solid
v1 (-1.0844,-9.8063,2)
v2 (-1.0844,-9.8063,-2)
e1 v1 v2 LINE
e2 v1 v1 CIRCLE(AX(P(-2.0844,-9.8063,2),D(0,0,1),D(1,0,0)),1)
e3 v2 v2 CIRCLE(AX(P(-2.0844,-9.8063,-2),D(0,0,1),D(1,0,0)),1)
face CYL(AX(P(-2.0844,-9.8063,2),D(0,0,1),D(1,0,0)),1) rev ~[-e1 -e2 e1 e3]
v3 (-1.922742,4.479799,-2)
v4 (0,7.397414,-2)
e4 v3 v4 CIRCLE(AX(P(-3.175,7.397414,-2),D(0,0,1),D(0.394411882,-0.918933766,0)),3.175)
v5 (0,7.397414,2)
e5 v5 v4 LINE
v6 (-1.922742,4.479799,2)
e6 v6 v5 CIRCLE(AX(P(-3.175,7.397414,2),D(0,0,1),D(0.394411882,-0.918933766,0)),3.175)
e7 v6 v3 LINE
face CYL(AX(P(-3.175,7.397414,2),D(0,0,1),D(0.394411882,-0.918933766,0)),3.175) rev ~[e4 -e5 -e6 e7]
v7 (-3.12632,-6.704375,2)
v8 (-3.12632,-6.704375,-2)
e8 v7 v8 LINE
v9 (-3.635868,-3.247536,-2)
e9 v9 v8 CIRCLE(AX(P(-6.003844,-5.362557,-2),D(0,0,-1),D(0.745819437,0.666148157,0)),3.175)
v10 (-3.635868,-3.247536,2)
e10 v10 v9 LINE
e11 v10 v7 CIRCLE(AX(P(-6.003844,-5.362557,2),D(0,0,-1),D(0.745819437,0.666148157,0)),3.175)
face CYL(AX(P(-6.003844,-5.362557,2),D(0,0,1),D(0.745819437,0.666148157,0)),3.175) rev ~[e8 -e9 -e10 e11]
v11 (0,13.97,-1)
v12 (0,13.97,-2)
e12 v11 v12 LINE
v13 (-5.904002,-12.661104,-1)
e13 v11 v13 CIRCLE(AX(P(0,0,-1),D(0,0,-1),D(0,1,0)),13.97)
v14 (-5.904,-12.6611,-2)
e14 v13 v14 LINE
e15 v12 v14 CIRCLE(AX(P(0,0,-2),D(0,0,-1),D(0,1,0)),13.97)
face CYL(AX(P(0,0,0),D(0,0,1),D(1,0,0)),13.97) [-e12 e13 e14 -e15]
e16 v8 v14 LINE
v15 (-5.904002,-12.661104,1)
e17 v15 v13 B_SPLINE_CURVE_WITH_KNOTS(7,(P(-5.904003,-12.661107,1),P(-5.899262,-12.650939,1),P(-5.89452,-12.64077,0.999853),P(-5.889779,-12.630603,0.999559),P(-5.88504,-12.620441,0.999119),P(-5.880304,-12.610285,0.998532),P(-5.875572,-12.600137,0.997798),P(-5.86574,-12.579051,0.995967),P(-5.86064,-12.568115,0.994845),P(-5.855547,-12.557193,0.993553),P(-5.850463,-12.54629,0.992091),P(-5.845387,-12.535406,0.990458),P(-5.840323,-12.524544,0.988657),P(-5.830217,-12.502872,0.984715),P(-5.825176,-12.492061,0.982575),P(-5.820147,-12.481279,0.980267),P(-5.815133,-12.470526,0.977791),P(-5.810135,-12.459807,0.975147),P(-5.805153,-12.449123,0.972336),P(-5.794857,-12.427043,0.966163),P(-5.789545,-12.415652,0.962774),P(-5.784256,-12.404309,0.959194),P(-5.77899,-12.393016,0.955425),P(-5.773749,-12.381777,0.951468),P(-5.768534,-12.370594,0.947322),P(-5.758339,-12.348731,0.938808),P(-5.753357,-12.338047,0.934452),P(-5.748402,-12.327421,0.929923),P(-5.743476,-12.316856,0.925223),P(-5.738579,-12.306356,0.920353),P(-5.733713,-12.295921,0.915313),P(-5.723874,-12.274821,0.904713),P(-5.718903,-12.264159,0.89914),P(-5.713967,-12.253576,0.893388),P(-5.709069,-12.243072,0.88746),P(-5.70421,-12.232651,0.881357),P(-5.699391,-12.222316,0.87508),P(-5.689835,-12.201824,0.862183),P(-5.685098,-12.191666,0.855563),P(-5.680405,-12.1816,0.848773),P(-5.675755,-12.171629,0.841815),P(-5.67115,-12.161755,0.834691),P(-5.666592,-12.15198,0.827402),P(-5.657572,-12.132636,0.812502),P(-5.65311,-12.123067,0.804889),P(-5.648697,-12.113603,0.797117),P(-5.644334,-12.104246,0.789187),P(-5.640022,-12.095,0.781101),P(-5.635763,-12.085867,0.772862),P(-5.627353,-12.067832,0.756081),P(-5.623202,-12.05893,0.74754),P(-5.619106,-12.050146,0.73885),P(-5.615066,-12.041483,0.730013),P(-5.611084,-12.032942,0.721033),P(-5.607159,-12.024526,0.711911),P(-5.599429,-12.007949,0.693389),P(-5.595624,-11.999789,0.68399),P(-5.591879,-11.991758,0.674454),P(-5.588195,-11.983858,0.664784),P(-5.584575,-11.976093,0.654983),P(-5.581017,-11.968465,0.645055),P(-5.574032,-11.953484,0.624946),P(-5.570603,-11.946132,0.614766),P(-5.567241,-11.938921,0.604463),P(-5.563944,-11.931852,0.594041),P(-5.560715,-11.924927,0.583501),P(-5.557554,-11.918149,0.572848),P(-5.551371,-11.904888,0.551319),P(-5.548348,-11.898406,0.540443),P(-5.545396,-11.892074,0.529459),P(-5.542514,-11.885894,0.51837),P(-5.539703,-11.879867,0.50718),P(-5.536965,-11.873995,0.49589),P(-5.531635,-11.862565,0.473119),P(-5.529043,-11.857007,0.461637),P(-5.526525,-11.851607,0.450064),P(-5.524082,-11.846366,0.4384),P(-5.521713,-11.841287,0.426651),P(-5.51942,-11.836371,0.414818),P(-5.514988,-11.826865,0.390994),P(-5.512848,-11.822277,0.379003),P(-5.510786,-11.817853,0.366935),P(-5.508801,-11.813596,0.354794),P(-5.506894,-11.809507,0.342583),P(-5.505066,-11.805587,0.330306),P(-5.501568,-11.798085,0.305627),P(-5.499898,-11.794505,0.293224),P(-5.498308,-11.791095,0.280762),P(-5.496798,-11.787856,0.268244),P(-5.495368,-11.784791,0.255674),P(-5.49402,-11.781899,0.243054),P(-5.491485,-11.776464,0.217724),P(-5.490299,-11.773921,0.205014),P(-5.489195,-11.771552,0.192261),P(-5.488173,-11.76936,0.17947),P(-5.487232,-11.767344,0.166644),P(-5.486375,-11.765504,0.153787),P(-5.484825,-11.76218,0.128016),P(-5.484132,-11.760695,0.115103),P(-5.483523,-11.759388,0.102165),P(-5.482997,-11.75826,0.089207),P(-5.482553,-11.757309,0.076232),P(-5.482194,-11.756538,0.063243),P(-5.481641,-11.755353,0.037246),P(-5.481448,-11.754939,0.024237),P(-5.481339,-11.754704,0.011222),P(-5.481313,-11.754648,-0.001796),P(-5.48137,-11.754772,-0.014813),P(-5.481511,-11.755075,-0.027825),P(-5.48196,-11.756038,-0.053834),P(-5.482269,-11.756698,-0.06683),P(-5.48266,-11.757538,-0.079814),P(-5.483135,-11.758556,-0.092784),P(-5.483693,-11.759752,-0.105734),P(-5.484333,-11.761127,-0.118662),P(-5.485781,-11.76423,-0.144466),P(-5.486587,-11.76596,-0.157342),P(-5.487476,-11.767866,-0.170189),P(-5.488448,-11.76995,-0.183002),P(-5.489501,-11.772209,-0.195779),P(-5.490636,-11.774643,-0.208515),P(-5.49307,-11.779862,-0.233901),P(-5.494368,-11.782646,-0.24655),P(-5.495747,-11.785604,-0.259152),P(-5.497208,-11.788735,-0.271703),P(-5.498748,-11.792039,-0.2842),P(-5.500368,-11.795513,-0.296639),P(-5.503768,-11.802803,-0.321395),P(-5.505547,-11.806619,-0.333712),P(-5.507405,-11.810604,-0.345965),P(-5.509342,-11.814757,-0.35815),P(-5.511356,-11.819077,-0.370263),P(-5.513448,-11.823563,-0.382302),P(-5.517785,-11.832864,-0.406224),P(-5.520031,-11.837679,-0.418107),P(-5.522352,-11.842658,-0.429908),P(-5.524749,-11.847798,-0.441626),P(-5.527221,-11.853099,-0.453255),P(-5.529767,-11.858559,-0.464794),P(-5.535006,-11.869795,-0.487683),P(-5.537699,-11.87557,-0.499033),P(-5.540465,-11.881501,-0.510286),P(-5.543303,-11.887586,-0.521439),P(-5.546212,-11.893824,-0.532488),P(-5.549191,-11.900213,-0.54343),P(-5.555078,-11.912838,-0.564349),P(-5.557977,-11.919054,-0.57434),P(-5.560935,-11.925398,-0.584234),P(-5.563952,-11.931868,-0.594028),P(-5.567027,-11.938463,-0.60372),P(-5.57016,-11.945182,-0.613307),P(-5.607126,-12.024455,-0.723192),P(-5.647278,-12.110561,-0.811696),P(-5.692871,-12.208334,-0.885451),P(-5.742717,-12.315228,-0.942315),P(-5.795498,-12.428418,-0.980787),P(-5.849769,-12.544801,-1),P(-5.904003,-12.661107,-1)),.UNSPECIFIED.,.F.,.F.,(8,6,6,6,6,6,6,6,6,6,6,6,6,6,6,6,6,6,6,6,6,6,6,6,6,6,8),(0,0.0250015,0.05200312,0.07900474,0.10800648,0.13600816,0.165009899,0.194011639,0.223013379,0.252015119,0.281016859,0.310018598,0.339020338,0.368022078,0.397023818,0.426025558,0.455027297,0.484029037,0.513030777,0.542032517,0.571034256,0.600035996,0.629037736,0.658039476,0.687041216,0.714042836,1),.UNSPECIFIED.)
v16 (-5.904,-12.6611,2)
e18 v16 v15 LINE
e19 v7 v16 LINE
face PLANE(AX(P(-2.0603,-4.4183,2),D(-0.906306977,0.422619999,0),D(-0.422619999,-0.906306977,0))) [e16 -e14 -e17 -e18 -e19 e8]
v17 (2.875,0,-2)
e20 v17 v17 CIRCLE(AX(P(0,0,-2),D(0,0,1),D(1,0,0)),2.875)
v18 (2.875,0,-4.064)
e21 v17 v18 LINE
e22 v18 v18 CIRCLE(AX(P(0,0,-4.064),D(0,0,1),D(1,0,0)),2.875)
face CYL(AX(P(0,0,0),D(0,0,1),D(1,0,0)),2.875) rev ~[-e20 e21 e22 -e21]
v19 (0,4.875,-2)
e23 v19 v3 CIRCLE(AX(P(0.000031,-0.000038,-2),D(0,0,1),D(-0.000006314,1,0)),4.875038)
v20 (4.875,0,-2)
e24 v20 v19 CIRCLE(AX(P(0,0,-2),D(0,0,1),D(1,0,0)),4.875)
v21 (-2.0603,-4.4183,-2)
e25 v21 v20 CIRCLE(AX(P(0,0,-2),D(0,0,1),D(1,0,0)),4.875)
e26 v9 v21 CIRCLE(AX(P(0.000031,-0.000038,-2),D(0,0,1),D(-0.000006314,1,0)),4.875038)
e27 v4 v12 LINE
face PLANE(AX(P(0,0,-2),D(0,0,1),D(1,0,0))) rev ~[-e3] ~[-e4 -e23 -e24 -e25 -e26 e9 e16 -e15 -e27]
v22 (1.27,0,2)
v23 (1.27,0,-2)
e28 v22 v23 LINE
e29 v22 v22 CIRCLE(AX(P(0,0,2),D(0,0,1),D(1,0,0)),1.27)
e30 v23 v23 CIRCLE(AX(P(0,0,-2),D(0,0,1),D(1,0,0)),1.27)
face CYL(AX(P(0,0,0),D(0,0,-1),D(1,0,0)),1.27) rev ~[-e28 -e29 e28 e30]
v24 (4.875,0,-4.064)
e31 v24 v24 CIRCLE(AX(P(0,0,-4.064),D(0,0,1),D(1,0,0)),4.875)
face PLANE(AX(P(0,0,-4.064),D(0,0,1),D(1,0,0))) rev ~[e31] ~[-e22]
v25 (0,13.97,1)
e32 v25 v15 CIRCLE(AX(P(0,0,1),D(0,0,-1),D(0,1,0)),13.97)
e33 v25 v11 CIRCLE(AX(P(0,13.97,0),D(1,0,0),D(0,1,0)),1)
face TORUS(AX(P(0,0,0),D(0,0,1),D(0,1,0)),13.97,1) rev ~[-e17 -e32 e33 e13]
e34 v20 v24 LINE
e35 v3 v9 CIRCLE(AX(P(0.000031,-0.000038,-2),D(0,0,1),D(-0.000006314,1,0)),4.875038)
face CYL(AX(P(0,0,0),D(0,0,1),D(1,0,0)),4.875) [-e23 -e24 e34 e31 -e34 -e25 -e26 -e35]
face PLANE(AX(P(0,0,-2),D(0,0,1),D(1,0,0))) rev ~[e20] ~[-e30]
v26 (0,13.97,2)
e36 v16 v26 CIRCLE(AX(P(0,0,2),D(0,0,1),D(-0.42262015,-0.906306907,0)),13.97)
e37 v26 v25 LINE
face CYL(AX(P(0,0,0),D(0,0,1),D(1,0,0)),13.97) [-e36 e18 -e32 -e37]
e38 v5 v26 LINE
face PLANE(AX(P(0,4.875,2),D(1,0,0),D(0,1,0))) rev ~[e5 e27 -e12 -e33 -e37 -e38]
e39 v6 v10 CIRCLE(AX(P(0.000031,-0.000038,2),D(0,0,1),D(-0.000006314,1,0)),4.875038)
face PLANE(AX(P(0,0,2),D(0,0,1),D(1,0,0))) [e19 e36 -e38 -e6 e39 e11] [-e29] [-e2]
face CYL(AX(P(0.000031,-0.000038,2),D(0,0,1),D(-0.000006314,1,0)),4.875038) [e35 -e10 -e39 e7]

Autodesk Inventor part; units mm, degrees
ref_plane "YZ Plane" through (0, 0, 0) normal (1, 0, 0) x (0, 1, 0)
ref_plane "XZ Plane" through (0, 0, 0) normal (0, 1, 0) x (-1, 0, 0)
ref_plane "XY Plane" through (0, 0, 0) normal (0, 0, 1) x (1, 0, 0)
sketch "Sketch1" plane through (0, 0, 0) normal (0, 0, 1) x (1, 0, 0)
  circle A0 centre (0, 0) radius 2.875
  circle A1 centre (0, 0) radius 4.875
  circle A2 centre (0, 0) radius 13.97
  dimension "d0" = 5.75
  dimension "d2" = 2
  dimension "d3" = 27.94
extrude "Extrusion1" add sketch "Sketch1" against normal blind 4.064 contours A1
sketch "Sketch2" plane through (0, 0, 0) normal (0, 0, 1) x (1, 0, 0)
  circle A0 centre (0, 0) radius 4.875 projected
  circle A1 centre (0, 0) radius 1.27
  circle A2 centre (0, 0) radius 13.97
  dimension "d6" = 2.54
  dimension "d7" = 27.94
extrude "Extrusion2" add sketch "Sketch2" along normal mid plane 4 contours A0 | A2
sketch "Sketch3" plane through (0, 0, 0) normal (1, 0, 0) x (0, 1, 0)
  line L0 (13.97, 2) -> (-13.97, 2) projected
  line L1 (-13.97, -2) -> (13.97, -2) projected
  line L2 (13.97, 2) -> (13.97, -2)
  circle A0 centre (13.97, 0) radius 1
  line L3 (0, 2) -> (0, -2) construction
  point P0 (0, 0)
  dimension "d10" = 2
revolve "Revolution1" cut sketch "Sketch3" angle 360 about axis through (0, 0, 2) along (0, 0, -1)
sketch "Sketch4" plane through (0, 0, 2) normal (0, 0, 1) x (1, 0, 0)
  circle A0 centre (0, 0) radius 13.97 projected
  line L0 (0, 4.875) -> (0, 13.97)
  line L1 (0, 0) -> (9.9312, 0) construction
  circle A1 centre (-2.0844, -9.8063) radius 1
  arc A2 (0, 4.875) -> (-2.0603, -4.4183) centre (0, 0) ccw
  line L2 (-2.0603, -4.4183) -> (-5.904, -12.6611)
  dimension "d13" = 2
extrude "Extrusion3" cut sketch "Sketch4" against normal blind 4 contours L0 A2 L2 A0 | A1 picked at (-8.1024, 7.2275)
fillet "Fillet1" radius 3.175 2 edges at (0, 4.875, 0) (-2.0603, -4.4183, 0)
properties part number "Pulley"
